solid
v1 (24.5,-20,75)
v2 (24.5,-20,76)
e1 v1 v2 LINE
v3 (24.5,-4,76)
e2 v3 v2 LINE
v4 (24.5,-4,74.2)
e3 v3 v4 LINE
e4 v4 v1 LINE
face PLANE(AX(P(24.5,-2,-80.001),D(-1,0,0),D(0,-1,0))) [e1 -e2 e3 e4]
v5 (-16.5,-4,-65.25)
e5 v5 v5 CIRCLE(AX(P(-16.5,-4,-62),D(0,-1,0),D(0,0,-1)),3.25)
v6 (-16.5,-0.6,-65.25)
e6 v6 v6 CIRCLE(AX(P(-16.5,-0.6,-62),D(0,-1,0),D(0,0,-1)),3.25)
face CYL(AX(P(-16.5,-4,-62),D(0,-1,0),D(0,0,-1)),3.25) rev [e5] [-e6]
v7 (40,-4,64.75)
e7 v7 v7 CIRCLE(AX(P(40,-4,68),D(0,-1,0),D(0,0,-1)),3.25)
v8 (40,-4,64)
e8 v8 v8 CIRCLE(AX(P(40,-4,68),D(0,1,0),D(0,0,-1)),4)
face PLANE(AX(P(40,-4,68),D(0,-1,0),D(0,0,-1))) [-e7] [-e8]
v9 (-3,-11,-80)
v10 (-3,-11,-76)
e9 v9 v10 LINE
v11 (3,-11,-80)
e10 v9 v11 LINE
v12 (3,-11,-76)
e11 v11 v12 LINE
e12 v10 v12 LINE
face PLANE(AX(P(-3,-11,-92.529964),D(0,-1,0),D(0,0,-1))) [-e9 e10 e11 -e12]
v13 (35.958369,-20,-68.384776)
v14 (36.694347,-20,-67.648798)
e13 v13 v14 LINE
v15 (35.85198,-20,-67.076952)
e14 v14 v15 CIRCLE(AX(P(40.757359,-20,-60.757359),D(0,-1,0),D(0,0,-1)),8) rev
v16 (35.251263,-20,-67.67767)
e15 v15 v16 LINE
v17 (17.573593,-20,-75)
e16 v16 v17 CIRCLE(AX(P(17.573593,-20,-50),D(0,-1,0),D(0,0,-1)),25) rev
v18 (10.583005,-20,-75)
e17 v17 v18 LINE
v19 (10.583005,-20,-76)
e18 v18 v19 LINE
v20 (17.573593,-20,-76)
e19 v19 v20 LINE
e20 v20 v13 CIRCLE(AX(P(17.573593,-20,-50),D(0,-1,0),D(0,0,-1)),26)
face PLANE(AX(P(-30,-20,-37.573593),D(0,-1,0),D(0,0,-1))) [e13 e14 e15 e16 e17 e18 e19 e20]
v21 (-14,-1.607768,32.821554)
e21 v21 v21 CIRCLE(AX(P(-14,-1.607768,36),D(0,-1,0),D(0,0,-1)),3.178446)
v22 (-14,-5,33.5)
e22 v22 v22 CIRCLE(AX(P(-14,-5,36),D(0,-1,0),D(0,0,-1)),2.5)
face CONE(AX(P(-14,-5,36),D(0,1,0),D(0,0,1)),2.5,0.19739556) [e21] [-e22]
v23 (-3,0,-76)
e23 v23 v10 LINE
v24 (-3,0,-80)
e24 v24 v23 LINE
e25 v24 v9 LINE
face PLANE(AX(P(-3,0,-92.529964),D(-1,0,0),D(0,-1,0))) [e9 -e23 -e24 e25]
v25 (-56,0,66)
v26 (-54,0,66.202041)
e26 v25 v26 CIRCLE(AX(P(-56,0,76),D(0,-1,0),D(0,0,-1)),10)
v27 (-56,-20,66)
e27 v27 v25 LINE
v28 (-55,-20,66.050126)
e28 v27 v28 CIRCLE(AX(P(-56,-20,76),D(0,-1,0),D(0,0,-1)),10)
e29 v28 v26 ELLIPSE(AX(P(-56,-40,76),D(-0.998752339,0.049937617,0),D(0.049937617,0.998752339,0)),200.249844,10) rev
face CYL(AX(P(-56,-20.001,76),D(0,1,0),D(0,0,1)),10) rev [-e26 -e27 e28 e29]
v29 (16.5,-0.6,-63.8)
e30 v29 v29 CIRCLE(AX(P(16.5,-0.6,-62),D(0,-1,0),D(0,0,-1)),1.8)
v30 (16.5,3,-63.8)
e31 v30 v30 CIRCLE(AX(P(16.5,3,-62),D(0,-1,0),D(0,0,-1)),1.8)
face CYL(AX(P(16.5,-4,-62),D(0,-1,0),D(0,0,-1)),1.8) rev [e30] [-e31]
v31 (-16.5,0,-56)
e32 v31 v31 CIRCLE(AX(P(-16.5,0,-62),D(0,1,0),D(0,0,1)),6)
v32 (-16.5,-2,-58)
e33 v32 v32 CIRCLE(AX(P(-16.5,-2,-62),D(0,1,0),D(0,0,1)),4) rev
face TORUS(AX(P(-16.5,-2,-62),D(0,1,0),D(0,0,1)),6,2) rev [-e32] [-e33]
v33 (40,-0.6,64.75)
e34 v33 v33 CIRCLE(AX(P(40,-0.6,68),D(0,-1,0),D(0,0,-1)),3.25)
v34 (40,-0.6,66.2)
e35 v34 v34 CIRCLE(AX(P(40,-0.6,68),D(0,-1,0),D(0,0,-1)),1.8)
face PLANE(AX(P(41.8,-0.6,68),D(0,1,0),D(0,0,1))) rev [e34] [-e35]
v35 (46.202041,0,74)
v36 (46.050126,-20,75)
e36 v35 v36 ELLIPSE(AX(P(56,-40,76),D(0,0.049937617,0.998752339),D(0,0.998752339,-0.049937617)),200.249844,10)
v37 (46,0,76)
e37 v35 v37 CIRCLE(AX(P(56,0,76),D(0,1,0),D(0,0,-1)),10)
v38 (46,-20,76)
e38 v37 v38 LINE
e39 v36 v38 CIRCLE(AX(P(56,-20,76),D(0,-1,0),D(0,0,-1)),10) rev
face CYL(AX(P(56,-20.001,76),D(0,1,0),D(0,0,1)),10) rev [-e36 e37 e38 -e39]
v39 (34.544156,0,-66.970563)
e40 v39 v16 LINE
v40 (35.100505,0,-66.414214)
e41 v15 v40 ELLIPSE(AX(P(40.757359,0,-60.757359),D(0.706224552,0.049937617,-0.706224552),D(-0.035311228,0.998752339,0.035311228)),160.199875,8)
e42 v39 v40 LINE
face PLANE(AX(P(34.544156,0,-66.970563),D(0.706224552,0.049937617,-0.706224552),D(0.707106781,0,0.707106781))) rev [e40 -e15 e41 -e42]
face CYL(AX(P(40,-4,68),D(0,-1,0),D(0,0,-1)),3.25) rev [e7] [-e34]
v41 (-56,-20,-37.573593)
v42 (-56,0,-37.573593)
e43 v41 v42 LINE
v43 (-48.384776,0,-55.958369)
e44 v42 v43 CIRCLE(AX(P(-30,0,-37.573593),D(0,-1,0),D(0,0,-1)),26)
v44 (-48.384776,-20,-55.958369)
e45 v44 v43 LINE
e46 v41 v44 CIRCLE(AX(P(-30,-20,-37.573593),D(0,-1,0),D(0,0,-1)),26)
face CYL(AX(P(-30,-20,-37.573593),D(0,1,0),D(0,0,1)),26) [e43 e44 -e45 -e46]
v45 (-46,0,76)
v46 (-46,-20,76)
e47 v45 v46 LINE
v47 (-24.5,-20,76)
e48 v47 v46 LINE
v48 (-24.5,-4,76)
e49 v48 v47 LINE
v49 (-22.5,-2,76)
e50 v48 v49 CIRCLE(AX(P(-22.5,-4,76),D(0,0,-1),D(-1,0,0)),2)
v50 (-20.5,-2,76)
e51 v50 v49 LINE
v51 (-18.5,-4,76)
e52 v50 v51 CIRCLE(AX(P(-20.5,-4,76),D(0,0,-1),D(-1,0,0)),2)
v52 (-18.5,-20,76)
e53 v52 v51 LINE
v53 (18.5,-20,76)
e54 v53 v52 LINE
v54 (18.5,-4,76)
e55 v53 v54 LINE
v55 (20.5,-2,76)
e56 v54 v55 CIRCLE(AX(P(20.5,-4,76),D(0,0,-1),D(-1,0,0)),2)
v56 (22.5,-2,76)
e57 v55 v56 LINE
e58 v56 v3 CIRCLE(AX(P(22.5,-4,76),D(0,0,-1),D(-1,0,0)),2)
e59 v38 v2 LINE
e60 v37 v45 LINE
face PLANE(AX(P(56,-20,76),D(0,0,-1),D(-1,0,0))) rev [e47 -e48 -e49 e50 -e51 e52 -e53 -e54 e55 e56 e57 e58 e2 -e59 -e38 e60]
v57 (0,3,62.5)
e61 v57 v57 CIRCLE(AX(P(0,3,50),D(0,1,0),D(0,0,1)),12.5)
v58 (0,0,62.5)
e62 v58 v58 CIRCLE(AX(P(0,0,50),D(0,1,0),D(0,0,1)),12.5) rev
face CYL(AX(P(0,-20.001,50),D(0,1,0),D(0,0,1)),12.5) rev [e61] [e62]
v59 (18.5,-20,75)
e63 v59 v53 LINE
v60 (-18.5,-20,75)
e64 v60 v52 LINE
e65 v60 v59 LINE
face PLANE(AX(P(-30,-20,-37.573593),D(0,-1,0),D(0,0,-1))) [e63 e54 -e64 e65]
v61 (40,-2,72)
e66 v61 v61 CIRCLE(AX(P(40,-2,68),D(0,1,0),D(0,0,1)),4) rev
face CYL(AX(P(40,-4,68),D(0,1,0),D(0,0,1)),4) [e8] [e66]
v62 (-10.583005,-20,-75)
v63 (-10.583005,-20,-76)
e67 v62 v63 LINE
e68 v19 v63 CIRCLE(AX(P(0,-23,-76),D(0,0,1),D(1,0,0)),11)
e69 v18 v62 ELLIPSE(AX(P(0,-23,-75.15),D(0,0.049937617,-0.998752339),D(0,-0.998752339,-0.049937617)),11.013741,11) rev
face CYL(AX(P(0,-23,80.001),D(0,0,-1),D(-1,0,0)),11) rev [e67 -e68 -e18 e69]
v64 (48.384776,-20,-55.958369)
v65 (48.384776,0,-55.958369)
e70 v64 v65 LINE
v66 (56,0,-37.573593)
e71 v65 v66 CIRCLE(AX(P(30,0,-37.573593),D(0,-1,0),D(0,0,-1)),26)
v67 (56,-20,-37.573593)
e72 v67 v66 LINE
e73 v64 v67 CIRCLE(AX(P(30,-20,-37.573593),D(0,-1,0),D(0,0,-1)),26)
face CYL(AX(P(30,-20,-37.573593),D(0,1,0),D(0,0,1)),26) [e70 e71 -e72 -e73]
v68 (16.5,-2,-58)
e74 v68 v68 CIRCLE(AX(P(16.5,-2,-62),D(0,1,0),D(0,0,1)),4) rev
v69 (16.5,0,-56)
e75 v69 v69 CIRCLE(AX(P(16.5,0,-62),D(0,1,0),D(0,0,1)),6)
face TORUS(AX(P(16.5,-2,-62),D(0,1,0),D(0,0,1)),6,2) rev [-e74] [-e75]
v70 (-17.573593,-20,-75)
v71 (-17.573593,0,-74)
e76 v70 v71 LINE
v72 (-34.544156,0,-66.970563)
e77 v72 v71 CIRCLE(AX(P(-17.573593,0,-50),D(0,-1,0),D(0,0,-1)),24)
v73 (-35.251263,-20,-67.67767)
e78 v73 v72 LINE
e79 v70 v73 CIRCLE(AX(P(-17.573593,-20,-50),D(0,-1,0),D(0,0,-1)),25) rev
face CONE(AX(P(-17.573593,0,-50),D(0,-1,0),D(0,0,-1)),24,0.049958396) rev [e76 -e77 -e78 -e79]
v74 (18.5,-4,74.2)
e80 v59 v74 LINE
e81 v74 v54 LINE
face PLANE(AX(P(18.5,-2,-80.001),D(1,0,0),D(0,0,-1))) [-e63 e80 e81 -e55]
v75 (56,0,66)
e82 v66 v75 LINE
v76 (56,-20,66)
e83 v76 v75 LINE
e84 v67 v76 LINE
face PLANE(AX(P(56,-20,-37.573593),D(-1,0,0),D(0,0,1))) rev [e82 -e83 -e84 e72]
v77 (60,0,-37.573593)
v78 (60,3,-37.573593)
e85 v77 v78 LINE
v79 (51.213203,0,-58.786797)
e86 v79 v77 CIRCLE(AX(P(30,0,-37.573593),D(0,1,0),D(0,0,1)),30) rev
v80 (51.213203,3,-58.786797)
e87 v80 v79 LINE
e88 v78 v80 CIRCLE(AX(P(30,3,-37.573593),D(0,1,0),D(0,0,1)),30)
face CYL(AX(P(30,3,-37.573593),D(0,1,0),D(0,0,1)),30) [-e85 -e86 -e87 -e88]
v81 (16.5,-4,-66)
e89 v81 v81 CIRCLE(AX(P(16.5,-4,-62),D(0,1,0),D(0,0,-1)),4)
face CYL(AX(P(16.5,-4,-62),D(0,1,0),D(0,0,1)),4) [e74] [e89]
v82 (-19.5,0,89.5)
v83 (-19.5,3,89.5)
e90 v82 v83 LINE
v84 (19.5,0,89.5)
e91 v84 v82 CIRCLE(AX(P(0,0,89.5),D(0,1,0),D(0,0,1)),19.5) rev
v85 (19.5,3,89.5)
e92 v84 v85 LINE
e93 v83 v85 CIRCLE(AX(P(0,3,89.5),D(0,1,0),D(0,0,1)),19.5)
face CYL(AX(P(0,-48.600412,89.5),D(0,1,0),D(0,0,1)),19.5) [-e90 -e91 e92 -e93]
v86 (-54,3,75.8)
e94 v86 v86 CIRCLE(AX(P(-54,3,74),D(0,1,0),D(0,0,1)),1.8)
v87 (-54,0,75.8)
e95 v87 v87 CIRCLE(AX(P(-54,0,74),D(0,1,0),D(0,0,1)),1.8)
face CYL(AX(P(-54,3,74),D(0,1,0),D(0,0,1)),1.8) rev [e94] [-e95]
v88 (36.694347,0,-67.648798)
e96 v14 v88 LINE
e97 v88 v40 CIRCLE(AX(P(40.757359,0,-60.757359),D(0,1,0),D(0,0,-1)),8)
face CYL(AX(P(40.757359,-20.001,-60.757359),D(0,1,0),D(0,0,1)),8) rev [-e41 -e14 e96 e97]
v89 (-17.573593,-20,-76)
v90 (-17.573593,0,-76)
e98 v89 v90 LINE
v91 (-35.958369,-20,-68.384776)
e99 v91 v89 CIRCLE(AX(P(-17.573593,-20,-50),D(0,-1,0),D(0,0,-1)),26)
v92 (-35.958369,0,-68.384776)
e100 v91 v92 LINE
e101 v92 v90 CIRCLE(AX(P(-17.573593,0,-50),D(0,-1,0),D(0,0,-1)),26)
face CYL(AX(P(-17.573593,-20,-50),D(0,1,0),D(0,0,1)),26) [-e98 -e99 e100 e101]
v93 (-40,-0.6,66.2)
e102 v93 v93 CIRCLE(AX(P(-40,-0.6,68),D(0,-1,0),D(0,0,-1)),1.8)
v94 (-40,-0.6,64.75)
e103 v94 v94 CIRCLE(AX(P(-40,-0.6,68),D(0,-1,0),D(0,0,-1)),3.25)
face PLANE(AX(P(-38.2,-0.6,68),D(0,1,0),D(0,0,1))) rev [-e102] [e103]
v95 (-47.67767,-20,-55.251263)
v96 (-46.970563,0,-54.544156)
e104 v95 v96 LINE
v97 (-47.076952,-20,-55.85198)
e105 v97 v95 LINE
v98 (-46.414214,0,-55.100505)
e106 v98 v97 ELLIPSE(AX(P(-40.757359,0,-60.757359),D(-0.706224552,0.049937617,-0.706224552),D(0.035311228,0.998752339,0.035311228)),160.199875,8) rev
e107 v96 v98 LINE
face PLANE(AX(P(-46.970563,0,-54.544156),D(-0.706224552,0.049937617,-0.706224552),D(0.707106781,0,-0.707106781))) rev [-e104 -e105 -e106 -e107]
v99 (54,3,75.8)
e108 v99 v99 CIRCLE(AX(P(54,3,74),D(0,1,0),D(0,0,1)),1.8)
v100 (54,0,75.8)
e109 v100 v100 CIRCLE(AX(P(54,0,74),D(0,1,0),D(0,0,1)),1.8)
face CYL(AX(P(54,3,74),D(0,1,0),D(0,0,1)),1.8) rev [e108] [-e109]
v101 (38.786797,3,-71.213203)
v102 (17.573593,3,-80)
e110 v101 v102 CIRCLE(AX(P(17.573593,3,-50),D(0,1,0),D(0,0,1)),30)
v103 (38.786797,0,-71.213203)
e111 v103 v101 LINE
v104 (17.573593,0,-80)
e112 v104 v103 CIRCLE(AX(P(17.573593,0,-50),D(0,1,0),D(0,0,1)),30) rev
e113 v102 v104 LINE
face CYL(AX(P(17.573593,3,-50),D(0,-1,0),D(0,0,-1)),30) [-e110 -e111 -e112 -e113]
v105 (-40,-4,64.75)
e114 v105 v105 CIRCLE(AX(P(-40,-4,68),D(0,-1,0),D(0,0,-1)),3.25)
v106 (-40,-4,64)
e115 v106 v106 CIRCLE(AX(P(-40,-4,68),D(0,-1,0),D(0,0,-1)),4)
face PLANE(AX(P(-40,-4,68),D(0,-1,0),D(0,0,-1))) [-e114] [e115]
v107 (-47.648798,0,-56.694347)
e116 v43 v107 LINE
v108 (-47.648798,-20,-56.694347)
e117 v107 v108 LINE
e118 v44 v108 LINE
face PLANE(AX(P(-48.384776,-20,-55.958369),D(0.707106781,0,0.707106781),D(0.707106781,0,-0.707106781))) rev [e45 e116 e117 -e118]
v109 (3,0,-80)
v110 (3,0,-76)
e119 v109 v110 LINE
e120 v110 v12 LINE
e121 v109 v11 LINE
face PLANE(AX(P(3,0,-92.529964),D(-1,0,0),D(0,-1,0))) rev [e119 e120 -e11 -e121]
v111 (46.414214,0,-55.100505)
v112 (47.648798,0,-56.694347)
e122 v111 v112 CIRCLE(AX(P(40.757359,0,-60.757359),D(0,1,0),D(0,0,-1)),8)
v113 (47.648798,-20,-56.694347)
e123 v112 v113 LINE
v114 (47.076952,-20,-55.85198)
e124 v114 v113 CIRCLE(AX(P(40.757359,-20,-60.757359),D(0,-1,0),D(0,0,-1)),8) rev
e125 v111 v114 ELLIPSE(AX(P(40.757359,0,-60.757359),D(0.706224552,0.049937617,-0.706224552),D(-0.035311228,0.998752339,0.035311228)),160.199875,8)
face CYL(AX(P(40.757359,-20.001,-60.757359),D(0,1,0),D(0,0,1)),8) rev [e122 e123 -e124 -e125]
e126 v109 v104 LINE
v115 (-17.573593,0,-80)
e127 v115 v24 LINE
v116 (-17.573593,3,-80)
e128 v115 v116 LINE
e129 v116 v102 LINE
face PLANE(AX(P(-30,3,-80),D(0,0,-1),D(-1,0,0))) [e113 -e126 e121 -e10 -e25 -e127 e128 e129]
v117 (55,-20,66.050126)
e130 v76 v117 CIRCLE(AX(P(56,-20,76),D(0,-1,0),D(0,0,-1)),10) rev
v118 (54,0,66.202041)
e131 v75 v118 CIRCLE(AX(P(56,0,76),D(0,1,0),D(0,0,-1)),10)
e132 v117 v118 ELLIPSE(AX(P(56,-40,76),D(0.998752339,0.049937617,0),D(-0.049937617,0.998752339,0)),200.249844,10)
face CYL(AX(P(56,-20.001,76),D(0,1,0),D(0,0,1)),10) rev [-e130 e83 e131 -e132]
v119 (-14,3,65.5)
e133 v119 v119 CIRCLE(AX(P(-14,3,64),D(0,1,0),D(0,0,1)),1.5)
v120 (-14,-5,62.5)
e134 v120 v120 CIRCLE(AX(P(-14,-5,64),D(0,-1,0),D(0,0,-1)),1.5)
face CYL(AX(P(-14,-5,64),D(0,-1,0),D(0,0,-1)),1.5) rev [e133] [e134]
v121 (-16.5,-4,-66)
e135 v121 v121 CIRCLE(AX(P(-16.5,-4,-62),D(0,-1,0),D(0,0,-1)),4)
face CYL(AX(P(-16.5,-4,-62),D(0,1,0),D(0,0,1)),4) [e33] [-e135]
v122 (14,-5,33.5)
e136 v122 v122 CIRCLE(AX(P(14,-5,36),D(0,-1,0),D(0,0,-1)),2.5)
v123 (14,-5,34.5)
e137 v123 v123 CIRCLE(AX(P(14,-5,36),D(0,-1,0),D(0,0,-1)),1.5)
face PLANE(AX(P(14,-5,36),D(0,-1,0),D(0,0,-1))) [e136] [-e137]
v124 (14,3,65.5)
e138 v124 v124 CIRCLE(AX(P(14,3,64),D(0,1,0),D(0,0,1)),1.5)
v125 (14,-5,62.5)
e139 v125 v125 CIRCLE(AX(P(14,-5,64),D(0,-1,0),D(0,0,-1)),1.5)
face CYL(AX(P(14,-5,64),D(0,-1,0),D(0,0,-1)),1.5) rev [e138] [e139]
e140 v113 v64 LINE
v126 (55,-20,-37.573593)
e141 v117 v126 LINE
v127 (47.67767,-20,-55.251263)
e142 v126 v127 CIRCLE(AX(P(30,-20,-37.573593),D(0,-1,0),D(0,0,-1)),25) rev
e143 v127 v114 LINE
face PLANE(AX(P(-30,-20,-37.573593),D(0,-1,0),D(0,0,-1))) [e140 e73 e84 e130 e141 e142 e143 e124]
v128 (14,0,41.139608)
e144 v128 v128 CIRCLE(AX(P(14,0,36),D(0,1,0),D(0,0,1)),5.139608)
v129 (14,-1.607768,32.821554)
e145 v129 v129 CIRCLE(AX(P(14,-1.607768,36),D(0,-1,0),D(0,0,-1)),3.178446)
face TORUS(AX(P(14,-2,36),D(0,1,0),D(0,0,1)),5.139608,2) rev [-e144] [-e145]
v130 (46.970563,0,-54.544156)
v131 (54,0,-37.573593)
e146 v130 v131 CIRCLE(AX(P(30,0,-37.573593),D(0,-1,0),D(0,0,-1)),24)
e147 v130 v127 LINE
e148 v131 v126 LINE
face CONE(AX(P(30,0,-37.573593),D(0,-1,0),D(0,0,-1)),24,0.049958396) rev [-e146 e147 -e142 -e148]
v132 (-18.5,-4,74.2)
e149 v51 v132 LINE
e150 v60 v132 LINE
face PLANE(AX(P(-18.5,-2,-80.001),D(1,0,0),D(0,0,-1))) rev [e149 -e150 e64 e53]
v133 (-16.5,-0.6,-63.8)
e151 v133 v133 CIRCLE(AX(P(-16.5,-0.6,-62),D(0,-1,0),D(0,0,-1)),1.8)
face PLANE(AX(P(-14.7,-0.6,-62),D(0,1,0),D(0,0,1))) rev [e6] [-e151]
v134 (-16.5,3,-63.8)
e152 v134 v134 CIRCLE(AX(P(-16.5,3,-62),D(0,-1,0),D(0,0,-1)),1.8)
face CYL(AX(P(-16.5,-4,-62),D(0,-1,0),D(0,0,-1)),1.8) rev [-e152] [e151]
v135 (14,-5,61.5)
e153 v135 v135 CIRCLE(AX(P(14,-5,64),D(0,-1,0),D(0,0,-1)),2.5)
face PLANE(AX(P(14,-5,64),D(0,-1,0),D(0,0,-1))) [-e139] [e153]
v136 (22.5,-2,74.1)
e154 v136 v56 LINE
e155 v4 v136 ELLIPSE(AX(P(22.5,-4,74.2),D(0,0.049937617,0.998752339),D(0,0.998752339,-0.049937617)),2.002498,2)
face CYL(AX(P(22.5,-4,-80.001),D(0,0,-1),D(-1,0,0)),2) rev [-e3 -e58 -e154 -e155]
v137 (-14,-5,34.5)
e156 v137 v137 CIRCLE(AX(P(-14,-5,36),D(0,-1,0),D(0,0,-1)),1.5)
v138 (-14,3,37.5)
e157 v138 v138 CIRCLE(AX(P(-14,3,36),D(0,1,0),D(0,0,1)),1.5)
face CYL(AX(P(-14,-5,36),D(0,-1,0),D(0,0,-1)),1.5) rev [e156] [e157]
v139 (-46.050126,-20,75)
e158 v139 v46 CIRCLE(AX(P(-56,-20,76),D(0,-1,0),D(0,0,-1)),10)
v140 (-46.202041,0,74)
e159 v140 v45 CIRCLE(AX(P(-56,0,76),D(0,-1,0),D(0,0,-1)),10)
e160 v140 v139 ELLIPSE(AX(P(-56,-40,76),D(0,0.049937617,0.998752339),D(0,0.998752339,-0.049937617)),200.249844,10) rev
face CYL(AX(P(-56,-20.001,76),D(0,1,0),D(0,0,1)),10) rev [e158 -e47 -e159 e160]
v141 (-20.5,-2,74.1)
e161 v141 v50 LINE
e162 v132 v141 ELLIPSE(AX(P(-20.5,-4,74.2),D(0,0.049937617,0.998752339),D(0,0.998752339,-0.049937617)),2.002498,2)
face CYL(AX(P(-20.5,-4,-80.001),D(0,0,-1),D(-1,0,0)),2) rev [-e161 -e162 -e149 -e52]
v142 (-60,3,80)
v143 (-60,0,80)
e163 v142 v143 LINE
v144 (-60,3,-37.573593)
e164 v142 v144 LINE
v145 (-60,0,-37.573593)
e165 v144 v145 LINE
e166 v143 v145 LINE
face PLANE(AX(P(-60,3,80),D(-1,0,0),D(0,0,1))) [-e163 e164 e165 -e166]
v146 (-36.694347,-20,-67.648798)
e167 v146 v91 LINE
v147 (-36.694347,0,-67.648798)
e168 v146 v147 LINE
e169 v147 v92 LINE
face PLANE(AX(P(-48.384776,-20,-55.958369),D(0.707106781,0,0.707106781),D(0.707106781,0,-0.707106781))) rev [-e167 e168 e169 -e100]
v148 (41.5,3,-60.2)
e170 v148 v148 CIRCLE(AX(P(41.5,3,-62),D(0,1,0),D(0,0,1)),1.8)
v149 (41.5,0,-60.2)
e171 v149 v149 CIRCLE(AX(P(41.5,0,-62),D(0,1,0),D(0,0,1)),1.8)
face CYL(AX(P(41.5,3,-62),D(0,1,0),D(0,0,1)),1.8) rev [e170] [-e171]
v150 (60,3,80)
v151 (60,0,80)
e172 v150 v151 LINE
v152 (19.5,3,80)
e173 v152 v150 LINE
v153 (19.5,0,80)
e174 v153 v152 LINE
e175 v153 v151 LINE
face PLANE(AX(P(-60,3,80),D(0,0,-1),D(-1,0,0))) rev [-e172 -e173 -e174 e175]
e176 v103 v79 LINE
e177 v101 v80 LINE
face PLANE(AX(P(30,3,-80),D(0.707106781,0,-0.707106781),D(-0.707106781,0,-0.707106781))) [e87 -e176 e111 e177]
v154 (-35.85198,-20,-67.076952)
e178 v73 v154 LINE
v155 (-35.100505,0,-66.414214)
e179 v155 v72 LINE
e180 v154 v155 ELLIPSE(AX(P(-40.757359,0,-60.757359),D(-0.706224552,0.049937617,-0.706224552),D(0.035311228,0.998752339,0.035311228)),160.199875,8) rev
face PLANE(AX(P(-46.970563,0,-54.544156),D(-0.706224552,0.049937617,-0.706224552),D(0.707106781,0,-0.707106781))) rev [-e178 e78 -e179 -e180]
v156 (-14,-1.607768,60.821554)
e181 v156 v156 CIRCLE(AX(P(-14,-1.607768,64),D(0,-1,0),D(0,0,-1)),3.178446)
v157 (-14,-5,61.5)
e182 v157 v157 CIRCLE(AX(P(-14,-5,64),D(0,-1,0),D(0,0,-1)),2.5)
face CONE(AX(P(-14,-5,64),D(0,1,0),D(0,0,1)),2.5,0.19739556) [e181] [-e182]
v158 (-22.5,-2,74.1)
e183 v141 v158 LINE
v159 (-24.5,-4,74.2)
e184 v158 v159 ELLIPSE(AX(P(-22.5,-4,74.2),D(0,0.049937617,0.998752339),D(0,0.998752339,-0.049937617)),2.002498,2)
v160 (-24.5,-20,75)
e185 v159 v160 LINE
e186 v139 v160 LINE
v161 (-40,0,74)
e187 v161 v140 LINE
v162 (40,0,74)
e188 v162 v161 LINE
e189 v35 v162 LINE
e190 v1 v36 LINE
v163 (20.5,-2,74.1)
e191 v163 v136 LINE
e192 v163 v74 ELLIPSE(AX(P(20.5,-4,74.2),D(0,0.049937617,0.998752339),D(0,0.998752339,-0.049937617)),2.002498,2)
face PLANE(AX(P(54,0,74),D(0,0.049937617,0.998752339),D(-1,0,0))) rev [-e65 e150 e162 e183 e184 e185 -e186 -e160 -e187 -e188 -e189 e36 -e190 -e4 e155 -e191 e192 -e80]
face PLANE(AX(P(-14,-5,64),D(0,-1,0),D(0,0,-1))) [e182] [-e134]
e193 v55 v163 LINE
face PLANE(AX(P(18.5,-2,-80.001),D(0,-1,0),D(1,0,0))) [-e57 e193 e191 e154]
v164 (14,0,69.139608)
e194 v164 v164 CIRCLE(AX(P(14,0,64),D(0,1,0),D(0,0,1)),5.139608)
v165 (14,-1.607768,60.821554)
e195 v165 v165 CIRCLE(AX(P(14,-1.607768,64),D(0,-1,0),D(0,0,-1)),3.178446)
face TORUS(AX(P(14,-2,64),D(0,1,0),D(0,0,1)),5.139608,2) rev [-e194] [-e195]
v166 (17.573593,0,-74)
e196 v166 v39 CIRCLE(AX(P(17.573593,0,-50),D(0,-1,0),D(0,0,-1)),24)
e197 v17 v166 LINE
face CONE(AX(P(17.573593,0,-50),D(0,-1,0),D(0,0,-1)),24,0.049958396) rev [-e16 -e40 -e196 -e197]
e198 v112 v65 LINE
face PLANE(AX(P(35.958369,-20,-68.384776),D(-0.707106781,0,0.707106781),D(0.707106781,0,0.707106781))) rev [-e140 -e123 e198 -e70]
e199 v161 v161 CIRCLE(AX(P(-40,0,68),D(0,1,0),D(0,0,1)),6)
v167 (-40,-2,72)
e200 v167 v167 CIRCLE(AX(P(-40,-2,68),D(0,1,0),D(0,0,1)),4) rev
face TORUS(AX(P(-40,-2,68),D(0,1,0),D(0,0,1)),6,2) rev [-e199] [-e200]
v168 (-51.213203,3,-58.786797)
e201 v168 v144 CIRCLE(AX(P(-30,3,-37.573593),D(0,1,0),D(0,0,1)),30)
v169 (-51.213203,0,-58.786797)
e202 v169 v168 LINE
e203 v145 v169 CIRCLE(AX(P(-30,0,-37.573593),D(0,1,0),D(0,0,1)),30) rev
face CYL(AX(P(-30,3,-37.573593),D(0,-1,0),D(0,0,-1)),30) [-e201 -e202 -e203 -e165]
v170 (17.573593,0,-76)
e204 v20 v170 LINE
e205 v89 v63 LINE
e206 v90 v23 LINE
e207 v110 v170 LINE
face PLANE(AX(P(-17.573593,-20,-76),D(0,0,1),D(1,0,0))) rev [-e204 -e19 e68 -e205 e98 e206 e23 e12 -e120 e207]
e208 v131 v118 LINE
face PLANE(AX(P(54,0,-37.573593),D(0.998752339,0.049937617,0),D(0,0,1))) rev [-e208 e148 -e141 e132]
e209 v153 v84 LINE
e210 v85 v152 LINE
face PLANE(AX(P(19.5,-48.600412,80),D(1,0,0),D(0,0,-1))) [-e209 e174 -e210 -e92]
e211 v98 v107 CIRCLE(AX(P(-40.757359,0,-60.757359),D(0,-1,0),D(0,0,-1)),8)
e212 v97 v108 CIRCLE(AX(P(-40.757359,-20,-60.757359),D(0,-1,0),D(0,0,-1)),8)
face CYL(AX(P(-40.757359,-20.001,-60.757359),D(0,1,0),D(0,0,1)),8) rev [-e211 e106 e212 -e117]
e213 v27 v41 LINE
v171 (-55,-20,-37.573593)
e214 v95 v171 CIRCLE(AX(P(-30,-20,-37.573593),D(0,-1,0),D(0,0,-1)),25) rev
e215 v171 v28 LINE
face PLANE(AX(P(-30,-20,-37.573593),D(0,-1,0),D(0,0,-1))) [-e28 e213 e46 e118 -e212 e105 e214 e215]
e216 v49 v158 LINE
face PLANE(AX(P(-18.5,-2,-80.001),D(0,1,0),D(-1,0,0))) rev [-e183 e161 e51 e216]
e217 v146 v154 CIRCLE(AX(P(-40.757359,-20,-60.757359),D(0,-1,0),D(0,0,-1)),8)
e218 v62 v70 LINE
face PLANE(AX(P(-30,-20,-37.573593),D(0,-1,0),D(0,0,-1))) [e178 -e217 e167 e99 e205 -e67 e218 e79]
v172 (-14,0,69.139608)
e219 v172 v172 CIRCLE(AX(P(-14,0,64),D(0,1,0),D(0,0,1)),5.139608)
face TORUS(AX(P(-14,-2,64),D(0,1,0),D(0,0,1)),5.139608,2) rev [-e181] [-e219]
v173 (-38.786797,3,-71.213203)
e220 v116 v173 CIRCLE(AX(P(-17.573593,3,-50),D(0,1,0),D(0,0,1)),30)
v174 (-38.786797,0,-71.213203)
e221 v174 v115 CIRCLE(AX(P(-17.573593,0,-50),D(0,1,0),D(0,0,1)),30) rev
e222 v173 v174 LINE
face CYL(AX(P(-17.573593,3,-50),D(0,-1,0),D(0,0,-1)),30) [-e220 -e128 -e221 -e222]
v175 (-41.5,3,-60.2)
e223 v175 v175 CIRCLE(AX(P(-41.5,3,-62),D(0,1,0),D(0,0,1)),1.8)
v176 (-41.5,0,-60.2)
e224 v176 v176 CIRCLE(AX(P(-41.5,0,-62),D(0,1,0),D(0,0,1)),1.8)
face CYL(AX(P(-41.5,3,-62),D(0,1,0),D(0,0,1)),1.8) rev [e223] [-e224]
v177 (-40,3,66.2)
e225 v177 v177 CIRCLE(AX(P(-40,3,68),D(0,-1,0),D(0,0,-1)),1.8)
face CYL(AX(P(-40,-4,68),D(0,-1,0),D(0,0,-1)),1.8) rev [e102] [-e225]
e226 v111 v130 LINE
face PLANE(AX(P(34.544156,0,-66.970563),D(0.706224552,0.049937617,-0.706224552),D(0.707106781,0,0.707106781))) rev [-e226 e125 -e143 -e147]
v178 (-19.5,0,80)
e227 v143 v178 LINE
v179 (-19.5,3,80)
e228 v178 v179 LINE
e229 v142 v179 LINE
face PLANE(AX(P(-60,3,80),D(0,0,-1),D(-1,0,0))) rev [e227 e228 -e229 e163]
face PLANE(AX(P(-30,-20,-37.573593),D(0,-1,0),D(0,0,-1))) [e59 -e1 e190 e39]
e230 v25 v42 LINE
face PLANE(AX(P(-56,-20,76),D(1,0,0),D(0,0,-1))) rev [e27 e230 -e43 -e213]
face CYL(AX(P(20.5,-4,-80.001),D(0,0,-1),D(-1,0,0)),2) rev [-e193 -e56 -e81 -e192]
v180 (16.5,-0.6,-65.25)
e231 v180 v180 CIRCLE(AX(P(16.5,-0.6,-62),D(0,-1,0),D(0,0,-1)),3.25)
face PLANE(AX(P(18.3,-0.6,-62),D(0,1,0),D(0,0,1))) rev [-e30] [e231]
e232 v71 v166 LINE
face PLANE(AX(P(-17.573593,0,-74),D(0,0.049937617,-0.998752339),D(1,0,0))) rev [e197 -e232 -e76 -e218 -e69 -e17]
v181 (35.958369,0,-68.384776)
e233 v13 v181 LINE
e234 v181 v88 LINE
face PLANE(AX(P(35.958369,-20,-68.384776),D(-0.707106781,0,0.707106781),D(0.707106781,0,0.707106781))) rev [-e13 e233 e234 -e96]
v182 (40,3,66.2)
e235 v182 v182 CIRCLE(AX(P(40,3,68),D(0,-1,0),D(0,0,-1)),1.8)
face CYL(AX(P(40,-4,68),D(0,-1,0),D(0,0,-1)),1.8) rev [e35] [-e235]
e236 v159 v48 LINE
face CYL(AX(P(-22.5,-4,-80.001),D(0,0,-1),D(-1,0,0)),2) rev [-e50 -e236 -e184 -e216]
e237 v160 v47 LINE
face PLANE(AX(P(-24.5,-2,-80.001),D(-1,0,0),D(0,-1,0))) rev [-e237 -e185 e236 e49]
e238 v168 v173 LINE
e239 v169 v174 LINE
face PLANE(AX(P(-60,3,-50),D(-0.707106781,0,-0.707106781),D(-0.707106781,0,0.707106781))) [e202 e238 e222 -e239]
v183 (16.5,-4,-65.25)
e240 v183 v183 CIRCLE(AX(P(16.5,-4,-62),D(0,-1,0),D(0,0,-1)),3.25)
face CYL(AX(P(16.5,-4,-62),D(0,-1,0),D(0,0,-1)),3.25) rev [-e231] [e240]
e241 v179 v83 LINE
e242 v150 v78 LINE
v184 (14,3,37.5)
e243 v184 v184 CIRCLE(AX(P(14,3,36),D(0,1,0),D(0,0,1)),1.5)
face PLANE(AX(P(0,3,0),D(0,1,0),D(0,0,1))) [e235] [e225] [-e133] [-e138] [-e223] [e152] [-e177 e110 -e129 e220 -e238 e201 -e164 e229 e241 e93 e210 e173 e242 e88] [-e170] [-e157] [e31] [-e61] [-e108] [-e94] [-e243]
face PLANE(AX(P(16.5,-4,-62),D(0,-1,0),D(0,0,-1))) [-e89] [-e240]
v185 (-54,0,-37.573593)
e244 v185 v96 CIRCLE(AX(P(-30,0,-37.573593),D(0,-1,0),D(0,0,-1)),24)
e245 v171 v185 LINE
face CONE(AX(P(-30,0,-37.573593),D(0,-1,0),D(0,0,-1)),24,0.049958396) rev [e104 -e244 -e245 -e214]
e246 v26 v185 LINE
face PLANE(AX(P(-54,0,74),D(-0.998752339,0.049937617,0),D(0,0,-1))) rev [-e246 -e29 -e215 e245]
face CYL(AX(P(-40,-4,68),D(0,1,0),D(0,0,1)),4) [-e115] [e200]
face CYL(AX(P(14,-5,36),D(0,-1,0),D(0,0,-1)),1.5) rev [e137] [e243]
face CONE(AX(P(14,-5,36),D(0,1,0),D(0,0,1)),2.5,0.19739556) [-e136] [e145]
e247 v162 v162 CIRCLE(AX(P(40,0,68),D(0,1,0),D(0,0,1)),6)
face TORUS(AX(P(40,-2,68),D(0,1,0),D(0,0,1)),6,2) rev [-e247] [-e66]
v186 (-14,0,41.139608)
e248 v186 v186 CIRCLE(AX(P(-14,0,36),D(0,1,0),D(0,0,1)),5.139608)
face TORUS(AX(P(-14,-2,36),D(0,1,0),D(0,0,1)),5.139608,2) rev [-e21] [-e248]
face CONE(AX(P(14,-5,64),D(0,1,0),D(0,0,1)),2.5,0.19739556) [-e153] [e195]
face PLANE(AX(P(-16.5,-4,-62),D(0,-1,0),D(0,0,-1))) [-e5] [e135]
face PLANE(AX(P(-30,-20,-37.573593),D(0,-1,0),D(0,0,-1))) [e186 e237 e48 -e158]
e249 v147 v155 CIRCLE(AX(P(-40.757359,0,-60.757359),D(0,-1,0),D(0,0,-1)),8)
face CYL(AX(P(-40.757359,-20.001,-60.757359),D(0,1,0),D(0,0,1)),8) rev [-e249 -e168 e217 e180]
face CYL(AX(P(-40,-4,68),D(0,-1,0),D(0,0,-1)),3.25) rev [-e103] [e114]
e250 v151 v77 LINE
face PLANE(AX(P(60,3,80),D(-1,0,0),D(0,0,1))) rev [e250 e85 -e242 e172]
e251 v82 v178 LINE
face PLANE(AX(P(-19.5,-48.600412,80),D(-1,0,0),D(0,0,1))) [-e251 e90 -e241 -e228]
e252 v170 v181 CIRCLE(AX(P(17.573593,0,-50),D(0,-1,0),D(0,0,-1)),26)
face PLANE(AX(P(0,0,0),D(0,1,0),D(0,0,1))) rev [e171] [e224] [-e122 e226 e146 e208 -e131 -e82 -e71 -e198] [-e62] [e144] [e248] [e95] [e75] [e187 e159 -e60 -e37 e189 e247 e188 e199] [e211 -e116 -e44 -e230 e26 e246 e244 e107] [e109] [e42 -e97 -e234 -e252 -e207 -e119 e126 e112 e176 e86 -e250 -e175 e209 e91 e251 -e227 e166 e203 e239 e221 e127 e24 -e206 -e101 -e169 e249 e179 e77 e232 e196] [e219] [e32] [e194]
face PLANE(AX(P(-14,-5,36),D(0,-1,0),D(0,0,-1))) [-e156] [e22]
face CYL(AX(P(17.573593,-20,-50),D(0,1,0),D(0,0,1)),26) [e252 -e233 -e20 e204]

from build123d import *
from OCP.BRepFilletAPI import BRepFilletAPI_MakeChamfer

# Parameters (mm, degrees)
BOSS_EXTRUDE1_DEPTH                                 = 3
FILLET1_R                                           = 30
BOSS_EXTRUDE2_DEPTH                                 = 20
CHAMFER2_SIZE                                       = 1
CHAMFER2_SIZE_2                                     = 20
CUT_EXTRUDE1_REACH                                  = 170.333
SKETCH3_W                                           = 6
SKETCH3_H                                           = 18
FILLET2_R                                           = 2
FILLET2_OF_MIRROR1_R                                = 2
CUT_EXTRUDE7_REACH                                  = 103.98
SKETCH14_R                                          = 10
SKETCH14_R_2                                        = 8
M3_CLEARANCE_HOLE1_D                                = 3.6
SKETCH18_R                                          = 4
BOSS_EXTRUDE5_DEPTH                                 = 4
FILLET6_R                                           = 2
FILLET6_OF_MIRROR5_R                                = 2
CBORE_FOR_M3_HEX_SOCKET_HEAD_CAP_SCREW1_D           = 3.6
CBORE_FOR_M3_HEX_SOCKET_HEAD_CAP_SCREW1_CBORE_D     = 6.5
CBORE_FOR_M3_HEX_SOCKET_HEAD_CAP_SCREW1_CBORE_DEPTH = 3.4
CUT_EXTRUDE4_REACH                                  = 170.333
SKETCH7_W                                           = 6
SKETCH7_H                                           = 11
BOSS_EXTRUDE3_DEPTH                                 = 4
CUT_EXTRUDE5_REACH                                  = 104.611
SKETCH10_R                                          = 12.5
SKETCH11_R                                          = 3.5
BOSS_EXTRUDE4_DEPTH                                 = 5
F_3_0MM_DOWEL_HOLE1_D                               = 3
F_3_0MM_DOWEL_HOLE1_DEPTH                           = 10
F_3_0MM_DOWEL_HOLE1_TIP                             = 0.901290929
CHAMFER3_SIZE                                       = 5
CHAMFER3_SIZE_2                                     = 1
BOSS_EXTRUDE6_DEPTH                                 = 3


with BuildPart() as part:
    # Sketch1 → Boss-Extrude1 (new body)
    with BuildSketch(Plane(origin=(0, 0, 0), x_dir=(1, 0, 0), z_dir=(0, 1, 0))):
        Polygon((-60, 50), (-30, 80), (30, 80), (60, 50), (60, -80), (-60, -80), align=None)
    extrude(amount=BOSS_EXTRUDE1_DEPTH)

    # Fillet1
    fillet1_edges = [part.edges().sort_by_distance(p)[0] for p in [
        (-60, 1.5, -50),
        (-30, 1.5, -80),
        (30, 1.5, -80),
        (60, 1.5, -50),
    ]]
    fillet(fillet1_edges, radius=FILLET1_R)

    # Sketch2 → Boss-Extrude2 (add)
    with BuildSketch(Plane.XZ):
        with BuildLine():
            Line((-56, 76), (-56, -37.573593129))
            ThreePointArc((-56, -37.573593129), (-54.020867845, -47.52336237), (-48.384776311, -55.95836944))
            Line((-48.384776311, -55.95836944), (-35.95836944, -68.384776311))
            ThreePointArc((-35.95836944, -68.384776311), (-27.52336237, -74.020867845), (-17.573593129, -76))
            Line((-17.573593129, -76), (17.573593129, -76))
            ThreePointArc((17.573593129, -76), (27.52336237, -74.020867845), (35.95836944, -68.384776311))
            Line((35.95836944, -68.384776311), (48.384776311, -55.95836944))
            ThreePointArc((48.384776311, -55.95836944), (54.020867845, -47.52336237), (56, -37.573593129))
            Line((56, -37.573593129), (56, 76))
            Line((56, 76), (-56, 76))
        make_face()
        with BuildLine():
            Line((54, 74), (-54, 74))
            Line((-54, 74), (-54, -37.573593129))
            ThreePointArc((-54, -37.573593129), (-52.17310878, -46.757995506), (-46.970562748, -54.544155877))
            Line((-46.970562748, -54.544155877), (-34.544155877, -66.970562748))
            ThreePointArc((-34.544155877, -66.970562748), (-26.757995506, -72.17310878), (-17.573593129, -74))
            Line((-17.573593129, -74), (17.573593129, -74))
            ThreePointArc((17.573593129, -74), (26.757995506, -72.17310878), (34.544155877, -66.970562748))
            Line((34.544155877, -66.970562748), (46.970562748, -54.544155877))
            ThreePointArc((46.970562748, -54.544155877), (52.17310878, -46.757995506), (54, -37.573593129))
            Line((54, -37.573593129), (54, 74))
        make_face(mode=Mode.SUBTRACT)
    extrude(amount=BOSS_EXTRUDE2_DEPTH)

    # Chamfer2
    # the kernel refuses this chamfer: 20, 1 mm, written as the material it takes off along each edge
    with BuildSketch(Plane(origin=(-54, -20, 74), x_dir=(-1, 0, 0), z_dir=(0, 0, -1)), Plane(origin=(54, -20, -37.573593129), x_dir=(1, 0, 0), z_dir=(0, 0, 1))) as chamfer2_piece_1:
        Polygon((CHAMFER2_SIZE, 0), (0, CHAMFER2_SIZE_2), (0, 0), align=None)
    extrude(amount=111.573593129, mode=Mode.SUBTRACT)
    with BuildSketch(Plane(origin=(-30, -20, -37.573593129), x_dir=(-1, 0, 0), z_dir=(0, 0, 1))) as chamfer2_piece_2:
        Polygon((24 + CHAMFER2_SIZE, 0), (24, -CHAMFER2_SIZE_2), (24, 0), align=None)
    revolve(axis=Axis((-30, -20, -37.573593129), (0, -1, 0)), revolution_arc=45, mode=Mode.SUBTRACT)
    with BuildSketch(Plane(origin=(-46.970562748, -20, -54.544155877), x_dir=(-0.7071067811865482, 0, -0.7071067811865469), z_dir=(0.7071067811865469, 0, -0.7071067811865481)), Plane(origin=(34.544155877, -20, -66.970562748), x_dir=(0.7071067811865481, 0, -0.7071067811865468), z_dir=(0.7071067811865469, 0, 0.7071067811865481))) as chamfer2_piece_3:
        Polygon((CHAMFER2_SIZE, 0), (0, CHAMFER2_SIZE_2), (0, 0), align=None)
    extrude(amount=17.573593129, mode=Mode.SUBTRACT)
    with BuildSketch(Plane(origin=(-17.573593129, -20, -50), x_dir=(-0.7071067811865478, 0, -0.7071067811865472), z_dir=(-0.7071067811865472, 0, 0.7071067811865478))) as chamfer2_piece_4:
        Polygon((24 + CHAMFER2_SIZE, 0), (24, -CHAMFER2_SIZE_2), (24, 0), align=None)
    revolve(axis=Axis((-17.573593129, -20, -50), (0, -1, 0)), revolution_arc=45, mode=Mode.SUBTRACT)
    with BuildSketch(Plane(origin=(-17.573593129, -20, -74), x_dir=(0, 0, -1), z_dir=(1, 0, 0))) as chamfer2_piece_5:
        Polygon((CHAMFER2_SIZE, 0), (0, CHAMFER2_SIZE_2), (0, 0), align=None)
    extrude(amount=35.147186258, mode=Mode.SUBTRACT)
    with BuildSketch(Plane(origin=(17.573593129, -20, -50), x_dir=(0, 0, -1), z_dir=(-1, 0, 0))) as chamfer2_piece_6:
        Polygon((24 + CHAMFER2_SIZE, 0), (24, -CHAMFER2_SIZE_2), (24, 0), align=None)
    revolve(axis=Axis((17.573593129, -20, -50), (0, -1, 0)), revolution_arc=45, mode=Mode.SUBTRACT)
    with BuildSketch(Plane(origin=(30, -20, -37.573593129), x_dir=(0.7071067811865482, 0, -0.7071067811865468), z_dir=(-0.7071067811865468, 0, -0.7071067811865482))) as chamfer2_piece_7:
        Polygon((24 + CHAMFER2_SIZE, 0), (24, -CHAMFER2_SIZE_2), (24, 0), align=None)
    revolve(axis=Axis((30, -20, -37.573593129), (0, -1, 0)), revolution_arc=45, mode=Mode.SUBTRACT)
    with BuildSketch(Plane(origin=(54, -20, 74), x_dir=(0, 0, 1), z_dir=(-1, 0, 0))) as chamfer2_piece_8:
        Polygon((CHAMFER2_SIZE, 0), (0, CHAMFER2_SIZE_2), (0, 0), align=None)
    extrude(amount=108, mode=Mode.SUBTRACT)
    with BuildSketch(Plane(origin=(-54, -20, 125.997600596), x_dir=(-1, 0, 0), z_dir=(0, 0, -1))) as chamfer2_piece_9a_section:
        Polygon((CHAMFER2_SIZE, 0), (0, CHAMFER2_SIZE_2), (0, 0), align=None)
    chamfer2_piece_9a = extrude(amount=163.571193725, mode=Mode.PRIVATE)
    chamfer2_piece_9a = split(chamfer2_piece_9a, bisect_by=Plane(origin=(-54, -20, 76), z_dir=(0, 0, -1)), keep=Keep.TOP, mode=Mode.PRIVATE)
    chamfer2_piece_9a = split(chamfer2_piece_9a, bisect_by=Plane(origin=(-54, -20, 74), z_dir=(0, 0, 1)), keep=Keep.TOP, mode=Mode.PRIVATE)
    with BuildSketch(Plane(origin=(54, -20, 74), x_dir=(0, 0, 1), z_dir=(-1, 0, 0))) as chamfer2_piece_9b_section:
        Polygon((CHAMFER2_SIZE, 0), (0, CHAMFER2_SIZE_2), (0, 0), align=None)
    chamfer2_piece_9b = extrude(amount=159.997600596, mode=Mode.PRIVATE)
    chamfer2_piece_9b = split(chamfer2_piece_9b, bisect_by=Plane(origin=(-56, -20, 74), z_dir=(1, 0, 0)), keep=Keep.TOP, mode=Mode.PRIVATE)
    chamfer2_piece_9b = split(chamfer2_piece_9b, bisect_by=Plane(origin=(-54, -20, 74), z_dir=(-1, 0, 0)), keep=Keep.TOP, mode=Mode.PRIVATE)
    chamfer2_piece_9 = chamfer2_piece_9a & chamfer2_piece_9b
    add(chamfer2_piece_9, mode=Mode.SUBTRACT)
    with BuildSketch(Plane(origin=(54, -20, -37.573593129), x_dir=(1, 0, 0), z_dir=(0, 0, 1))) as chamfer2_piece_10a_section:
        Polygon((CHAMFER2_SIZE, 0), (0, CHAMFER2_SIZE_2), (0, 0), align=None)
    chamfer2_piece_10a = extrude(amount=163.571193725, mode=Mode.PRIVATE)
    chamfer2_piece_10a = split(chamfer2_piece_10a, bisect_by=Plane(origin=(54, -20, 76), z_dir=(0, 0, -1)), keep=Keep.TOP, mode=Mode.PRIVATE)
    chamfer2_piece_10a = split(chamfer2_piece_10a, bisect_by=Plane(origin=(54, -20, 74), z_dir=(0, 0, 1)), keep=Keep.TOP, mode=Mode.PRIVATE)
    with BuildSketch(Plane(origin=(105.997600596, -20, 74), x_dir=(0, 0, 1), z_dir=(-1, 0, 0))) as chamfer2_piece_10b_section:
        Polygon((CHAMFER2_SIZE, 0), (0, CHAMFER2_SIZE_2), (0, 0), align=None)
    chamfer2_piece_10b = extrude(amount=159.997600596, mode=Mode.PRIVATE)
    chamfer2_piece_10b = split(chamfer2_piece_10b, bisect_by=Plane(origin=(56, -20, 74), z_dir=(-1, 0, 0)), keep=Keep.TOP, mode=Mode.PRIVATE)
    chamfer2_piece_10b = split(chamfer2_piece_10b, bisect_by=Plane(origin=(54, -20, 74), z_dir=(1, 0, 0)), keep=Keep.TOP, mode=Mode.PRIVATE)
    chamfer2_piece_10 = chamfer2_piece_10a & chamfer2_piece_10b
    add(chamfer2_piece_10, mode=Mode.SUBTRACT)

    # Cut-Extrude1: up to this plane
    cut_extrude1_end = Plane(origin=(54, 0, 74), z_dir=(0, 0.049937616943888354, 0.9987523388778449))
    # Sketch3 → Cut-Extrude1 (cut, up to the surface)
    with BuildSketch(Plane.XY.offset(76), mode=Mode.PRIVATE) as cut_extrude1_sk1:
        with Locations((-21.5, -11)):
            Rectangle(SKETCH3_W, SKETCH3_H)
    cut_extrude1_tool1 = split(extrude(cut_extrude1_sk1.sketch, amount=-CUT_EXTRUDE1_REACH, mode=Mode.PRIVATE), bisect_by=cut_extrude1_end, keep=Keep.BOTH, mode=Mode.PRIVATE)
    cut_extrude1 = cut_extrude1_tool1.solids().sort_by_distance((-21.5, -11, 76))[0]
    add(cut_extrude1, mode=Mode.SUBTRACT)

    # Fillet2
    fillet2_edges = [part.edges().sort_by_distance(p)[0] for p in [
        (-24.5, -2, 75.05),
        (-18.5, -2, 75.05),
    ]]
    fillet(fillet2_edges, radius=FILLET2_R)

    # Mirror1: Cut-Extrude1 across plane
    add(cut_extrude1.mirror(Plane(origin=(0, 0, 0), x_dir=(0, 0, 1), z_dir=(1, 0, 0))), mode=Mode.SUBTRACT)

    # Fillet2 of Mirror1
    fillet2_of_mirror1_edges = [part.edges().sort_by_distance(p)[0] for p in [
        (24.5, -2, 75.05),
        (18.5, -2, 75.05),
    ]]
    fillet(fillet2_of_mirror1_edges, radius=FILLET2_OF_MIRROR1_R)

    # Sketch14 → Cut-Extrude7 (cut, up to next)
    with BuildSketch(Plane.XZ, mode=Mode.PRIVATE) as cut_extrude7_sk1:
        with Locations((-56, 76)):
            Circle(SKETCH14_R)
    cut_extrude7_tool1 = extrude(cut_extrude7_sk1.sketch, amount=CUT_EXTRUDE7_REACH, mode=Mode.PRIVATE) & part.part
    # Sketch14 → Cut-Extrude7 (cut, up to next)
    with BuildSketch(Plane.XZ, mode=Mode.PRIVATE) as cut_extrude7_sk2:
        with Locations((-40.757359313, -60.757359313)):
            Circle(SKETCH14_R_2)
    cut_extrude7_tool2 = extrude(cut_extrude7_sk2.sketch, amount=CUT_EXTRUDE7_REACH, mode=Mode.PRIVATE) & part.part
    cut_extrude7_1 = cut_extrude7_tool1.solids().sort_by_distance((-56, 0, 76))[0]
    add(cut_extrude7_1, mode=Mode.SUBTRACT)
    cut_extrude7_2 = cut_extrude7_tool2.solids().sort_by_distance((-40.757359, 0, -60.757359))[0]
    add(cut_extrude7_2, mode=Mode.SUBTRACT)
    cut_extrude7 = cut_extrude7_1 + cut_extrude7_2  # Cut-Extrude7 as one shape, for the pattern or mirror that repeats it

    # M3 Clearance Hole1 (through all)
    with Locations(Plane(origin=(0, 3, 0), x_dir=(1, 0, 0), z_dir=(0, 1, 0))):
        with Locations((-54, -74), (-41.5, 62)):
            m3_clearance_hole1 = Hole(M3_CLEARANCE_HOLE1_D / 2)

    # Sketch18 → Boss-Extrude5 (add)
    with BuildSketch(Plane.XZ):
        with Locations(Location((-16.5, -62, 0), (0, 0, 90))):
            Circle(SKETCH18_R)
        with Locations(Location((-40, 68, 0), (0, 0, 90))):
            Circle(SKETCH18_R)
    boss_extrude5 = extrude(amount=BOSS_EXTRUDE5_DEPTH)

    # Fillet6
    fillet6_edges = [part.edges().sort_by_distance(p)[0] for p in [
        (-16.5, 0, -66),
        (-40, 0, 64),
    ]]
    fillet(fillet6_edges, radius=FILLET6_R - 0.0001)  # a hair under: the kernel refuses the full size

    # Mirror5: Cut-Extrude7, M3 Clearance Hole1, Boss-Extrude5 across plane
    add(cut_extrude7.mirror(Plane(origin=(0, 0, 0), x_dir=(0, 0, 1), z_dir=(1, 0, 0))), mode=Mode.SUBTRACT)
    add(m3_clearance_hole1.mirror(Plane(origin=(0, 0, 0), x_dir=(0, 0, 1), z_dir=(1, 0, 0))), mode=Mode.SUBTRACT)
    add(boss_extrude5.mirror(Plane(origin=(0, 0, 0), x_dir=(0, 0, 1), z_dir=(1, 0, 0))))

    # Fillet6 of Mirror5
    fillet6_of_mirror5_edges = [part.edges().sort_by_distance(p)[0] for p in [
        (16.5, 0, -66),
        (40, 0, 64),
    ]]
    fillet(fillet6_of_mirror5_edges, radius=FILLET6_OF_MIRROR5_R - 0.0001)  # a hair under: the kernel refuses the full size

    # CBORE for M3 Hex Socket Head Cap Screw1 (through all)
    with Locations(Plane(origin=(0, -4, 0), x_dir=(-1, 0, 0), z_dir=(0, -1, 0))):
        with Locations((16.5, 62), (-16.5, 62), (-40, -68), (40, -68)):
            CounterBoreHole(CBORE_FOR_M3_HEX_SOCKET_HEAD_CAP_SCREW1_D / 2, CBORE_FOR_M3_HEX_SOCKET_HEAD_CAP_SCREW1_CBORE_D / 2, CBORE_FOR_M3_HEX_SOCKET_HEAD_CAP_SCREW1_CBORE_DEPTH)

    # Cut-Extrude4: up to this plane
    cut_extrude4_end = Plane(origin=(-17.573593129, 0, -74), z_dir=(0, 0.0499376169438892, -0.9987523388778449))
    # Sketch6 → Cut-Extrude4 (cut, up to the surface)
    with BuildSketch(Plane(origin=(0, 0, -76), x_dir=(-1, 0, 0), z_dir=(0, 0, -1)), mode=Mode.PRIVATE) as cut_extrude4_sk1:
        with BuildLine():
            Line((-10.583005244, -20), (10.583005244, -20))
            ThreePointArc((10.583005244, -20), (0, -12), (-10.583005244, -20))
        make_face()
    cut_extrude4_tool1 = split(extrude(cut_extrude4_sk1.sketch, amount=-CUT_EXTRUDE4_REACH, mode=Mode.PRIVATE), bisect_by=cut_extrude4_end, keep=Keep.BOTH, mode=Mode.PRIVATE)
    add(cut_extrude4_tool1.solids().sort_by_distance((0, -16.673049, -76))[0], mode=Mode.SUBTRACT)

    # Sketch7 → Boss-Extrude3 (add)
    with BuildSketch(Plane(origin=(0, 0, -76), x_dir=(-1, 0, 0), z_dir=(0, 0, -1))):
        with Locations((0, -5.5)):
            Rectangle(SKETCH7_W, SKETCH7_H)
    extrude(amount=BOSS_EXTRUDE3_DEPTH)

    # Sketch10 → Cut-Extrude5 (cut, up to next)
    with BuildSketch(Plane(origin=(0, 3, 0), x_dir=(1, 0, 0), z_dir=(0, 1, 0)), mode=Mode.PRIVATE) as cut_extrude5_sk1:
        with Locations(Location((0, -50, 0), (0, 0, 270))):
            Circle(SKETCH10_R)
    cut_extrude5_tool1 = extrude(cut_extrude5_sk1.sketch, amount=-CUT_EXTRUDE5_REACH, mode=Mode.PRIVATE) & part.part
    add(cut_extrude5_tool1.solids().sort_by_distance((0, 3, 50))[0], mode=Mode.SUBTRACT)

    # Sketch11 → Boss-Extrude4 (add)
    with BuildSketch(Plane.XZ):
        with Locations(Location((-14, 64, 0), (0, 0, 90))):
            Circle(SKETCH11_R)
        with Locations(Location((14, 64, 0), (0, 0, 90))):
            Circle(SKETCH11_R)
        with Locations(Location((14, 36, 0), (0, 0, 90))):
            Circle(SKETCH11_R)
        with Locations(Location((-14, 36, 0), (0, 0, 90))):
            Circle(SKETCH11_R)
    extrude(amount=BOSS_EXTRUDE4_DEPTH)

    # Ø3.0mm Dowel Hole1
    with Locations(Plane(origin=(0, -5, 0), x_dir=(-1, 0, 0), z_dir=(0, -1, 0))):
        with Locations((14, -64), (-14, -64), (-14, -36), (14, -36)):
            Hole(F_3_0MM_DOWEL_HOLE1_D / 2, depth=F_3_0MM_DOWEL_HOLE1_DEPTH)
            with Locations((0, 0, -(F_3_0MM_DOWEL_HOLE1_DEPTH + F_3_0MM_DOWEL_HOLE1_TIP / 2))):  # 118° drill point
                Cone(0, F_3_0MM_DOWEL_HOLE1_D / 2, F_3_0MM_DOWEL_HOLE1_TIP, mode=Mode.SUBTRACT)

    # Chamfer3
    chamfer3_edges_1 = [part.edges().sort_by_distance(p)[0] for p in [
        (-14, -5, 60.5),
    ]]
    chamfer3_side_1 = [part.faces().sort_by_distance(p)[0] for p in [
        (-14, -4.98, 60.5),
    ]]
    chamfer3_edges_2 = [part.edges().sort_by_distance(p)[0] for p in [
        (14, -5, 60.5),
    ]]
    chamfer3_side_2 = [part.faces().sort_by_distance(p)[0] for p in [
        (14, -4.98, 60.5),
    ]]
    chamfer3_edges_3 = [part.edges().sort_by_distance(p)[0] for p in [
        (14, -5, 32.5),
    ]]
    chamfer3_side_3 = [part.faces().sort_by_distance(p)[0] for p in [
        (14, -4.98, 32.5),
    ]]
    chamfer3_edges_4 = [part.edges().sort_by_distance(p)[0] for p in [
        (-14, -5, 32.5),
    ]]
    chamfer3_side_4 = [part.faces().sort_by_distance(p)[0] for p in [
        (-14, -4.98, 32.5),
    ]]
    chamfer3 = BRepFilletAPI_MakeChamfer(part.part.solid().wrapped)
    for e in chamfer3_edges_1:
        chamfer3.Add(CHAMFER3_SIZE - 0.0001, CHAMFER3_SIZE_2 - 0.0001, e.wrapped, chamfer3_side_1[0].wrapped)
    for e in chamfer3_edges_2:
        chamfer3.Add(CHAMFER3_SIZE - 0.0001, CHAMFER3_SIZE_2 - 0.0001, e.wrapped, chamfer3_side_2[0].wrapped)
    for e in chamfer3_edges_3:
        chamfer3.Add(CHAMFER3_SIZE - 0.0001, CHAMFER3_SIZE_2 - 0.0001, e.wrapped, chamfer3_side_3[0].wrapped)
    for e in chamfer3_edges_4:
        chamfer3.Add(CHAMFER3_SIZE - 0.0001, CHAMFER3_SIZE_2 - 0.0001, e.wrapped, chamfer3_side_4[0].wrapped)
    add(Compound.cast(chamfer3.Shape()), mode=Mode.REPLACE)  # a hair under: the kernel refuses the full size

    # Fillet5: read off the stored shape, not the designer's step
    # Fillet5 outline → Fillet5 (revolve)
    with BuildSketch(Plane(origin=(-14, 0, 36), x_dir=(1, 0, 0), z_dir=(0, 0, 1))):
        with BuildLine():
            ThreePointArc((3.178446454, -1.60776773), (3.871629994, -0.453315717), (5.139607805, 0))
            Line((5.139607805, 0), (3.178446454, 0))
            Line((3.178446454, 0), (3.178446454, -1.60776773))
        make_face()
    revolve(axis=Axis((-14, 0, 36), (0, 1, 0)))

    # Fillet5 2 outline → Fillet5 2 (revolve)
    with BuildSketch(Plane(origin=(14, 0, 36), x_dir=(1, 0, 0), z_dir=(0, 0, 1))):
        with BuildLine():
            ThreePointArc((3.178446454, -1.60776773), (3.871629994, -0.453315717), (5.139607805, 0))
            Line((5.139607805, 0), (3.178446454, 0))
            Line((3.178446454, 0), (3.178446454, -1.60776773))
        make_face()
    revolve(axis=Axis((14, 0, 36), (0, 1, 0)))

    # Fillet5 3 outline → Fillet5 3 (revolve)
    with BuildSketch(Plane(origin=(14, 0, 64), x_dir=(1, 0, 0), z_dir=(0, 0, 1))):
        with BuildLine():
            ThreePointArc((3.178446454, -1.60776773), (3.871629994, -0.453315717), (5.139607805, 0))
            Line((5.139607805, 0), (3.178446454, 0))
            Line((3.178446454, 0), (3.178446454, -1.60776773))
        make_face()
    revolve(axis=Axis((14, 0, 64), (0, 1, 0)))

    # Fillet5 4 outline → Fillet5 4 (revolve)
    with BuildSketch(Plane(origin=(-14, 0, 64), x_dir=(1, 0, 0), z_dir=(0, 0, 1))):
        with BuildLine():
            ThreePointArc((3.178446454, -1.60776773), (3.871629994, -0.453315717), (5.139607805, 0))
            Line((5.139607805, 0), (3.178446454, 0))
            Line((3.178446454, 0), (3.178446454, -1.60776773))
        make_face()
    revolve(axis=Axis((-14, 0, 64), (0, 1, 0)))

    # Sketch24 → Boss-Extrude6 (add)
    with BuildSketch(Plane(origin=(0, 3, 0), x_dir=(1, 0, 0), z_dir=(0, 1, 0))):
        with BuildLine():
            Line((-19.5, -80), (19.5, -80))
            Line((19.5, -80), (19.5, -89.5))
            ThreePointArc((19.5, -89.5), (0, -109), (-19.5, -89.5))
            Line((-19.5, -89.5), (-19.5, -80))
        make_face()
    extrude(amount=-BOSS_EXTRUDE6_DEPTH)


solid = part.part
